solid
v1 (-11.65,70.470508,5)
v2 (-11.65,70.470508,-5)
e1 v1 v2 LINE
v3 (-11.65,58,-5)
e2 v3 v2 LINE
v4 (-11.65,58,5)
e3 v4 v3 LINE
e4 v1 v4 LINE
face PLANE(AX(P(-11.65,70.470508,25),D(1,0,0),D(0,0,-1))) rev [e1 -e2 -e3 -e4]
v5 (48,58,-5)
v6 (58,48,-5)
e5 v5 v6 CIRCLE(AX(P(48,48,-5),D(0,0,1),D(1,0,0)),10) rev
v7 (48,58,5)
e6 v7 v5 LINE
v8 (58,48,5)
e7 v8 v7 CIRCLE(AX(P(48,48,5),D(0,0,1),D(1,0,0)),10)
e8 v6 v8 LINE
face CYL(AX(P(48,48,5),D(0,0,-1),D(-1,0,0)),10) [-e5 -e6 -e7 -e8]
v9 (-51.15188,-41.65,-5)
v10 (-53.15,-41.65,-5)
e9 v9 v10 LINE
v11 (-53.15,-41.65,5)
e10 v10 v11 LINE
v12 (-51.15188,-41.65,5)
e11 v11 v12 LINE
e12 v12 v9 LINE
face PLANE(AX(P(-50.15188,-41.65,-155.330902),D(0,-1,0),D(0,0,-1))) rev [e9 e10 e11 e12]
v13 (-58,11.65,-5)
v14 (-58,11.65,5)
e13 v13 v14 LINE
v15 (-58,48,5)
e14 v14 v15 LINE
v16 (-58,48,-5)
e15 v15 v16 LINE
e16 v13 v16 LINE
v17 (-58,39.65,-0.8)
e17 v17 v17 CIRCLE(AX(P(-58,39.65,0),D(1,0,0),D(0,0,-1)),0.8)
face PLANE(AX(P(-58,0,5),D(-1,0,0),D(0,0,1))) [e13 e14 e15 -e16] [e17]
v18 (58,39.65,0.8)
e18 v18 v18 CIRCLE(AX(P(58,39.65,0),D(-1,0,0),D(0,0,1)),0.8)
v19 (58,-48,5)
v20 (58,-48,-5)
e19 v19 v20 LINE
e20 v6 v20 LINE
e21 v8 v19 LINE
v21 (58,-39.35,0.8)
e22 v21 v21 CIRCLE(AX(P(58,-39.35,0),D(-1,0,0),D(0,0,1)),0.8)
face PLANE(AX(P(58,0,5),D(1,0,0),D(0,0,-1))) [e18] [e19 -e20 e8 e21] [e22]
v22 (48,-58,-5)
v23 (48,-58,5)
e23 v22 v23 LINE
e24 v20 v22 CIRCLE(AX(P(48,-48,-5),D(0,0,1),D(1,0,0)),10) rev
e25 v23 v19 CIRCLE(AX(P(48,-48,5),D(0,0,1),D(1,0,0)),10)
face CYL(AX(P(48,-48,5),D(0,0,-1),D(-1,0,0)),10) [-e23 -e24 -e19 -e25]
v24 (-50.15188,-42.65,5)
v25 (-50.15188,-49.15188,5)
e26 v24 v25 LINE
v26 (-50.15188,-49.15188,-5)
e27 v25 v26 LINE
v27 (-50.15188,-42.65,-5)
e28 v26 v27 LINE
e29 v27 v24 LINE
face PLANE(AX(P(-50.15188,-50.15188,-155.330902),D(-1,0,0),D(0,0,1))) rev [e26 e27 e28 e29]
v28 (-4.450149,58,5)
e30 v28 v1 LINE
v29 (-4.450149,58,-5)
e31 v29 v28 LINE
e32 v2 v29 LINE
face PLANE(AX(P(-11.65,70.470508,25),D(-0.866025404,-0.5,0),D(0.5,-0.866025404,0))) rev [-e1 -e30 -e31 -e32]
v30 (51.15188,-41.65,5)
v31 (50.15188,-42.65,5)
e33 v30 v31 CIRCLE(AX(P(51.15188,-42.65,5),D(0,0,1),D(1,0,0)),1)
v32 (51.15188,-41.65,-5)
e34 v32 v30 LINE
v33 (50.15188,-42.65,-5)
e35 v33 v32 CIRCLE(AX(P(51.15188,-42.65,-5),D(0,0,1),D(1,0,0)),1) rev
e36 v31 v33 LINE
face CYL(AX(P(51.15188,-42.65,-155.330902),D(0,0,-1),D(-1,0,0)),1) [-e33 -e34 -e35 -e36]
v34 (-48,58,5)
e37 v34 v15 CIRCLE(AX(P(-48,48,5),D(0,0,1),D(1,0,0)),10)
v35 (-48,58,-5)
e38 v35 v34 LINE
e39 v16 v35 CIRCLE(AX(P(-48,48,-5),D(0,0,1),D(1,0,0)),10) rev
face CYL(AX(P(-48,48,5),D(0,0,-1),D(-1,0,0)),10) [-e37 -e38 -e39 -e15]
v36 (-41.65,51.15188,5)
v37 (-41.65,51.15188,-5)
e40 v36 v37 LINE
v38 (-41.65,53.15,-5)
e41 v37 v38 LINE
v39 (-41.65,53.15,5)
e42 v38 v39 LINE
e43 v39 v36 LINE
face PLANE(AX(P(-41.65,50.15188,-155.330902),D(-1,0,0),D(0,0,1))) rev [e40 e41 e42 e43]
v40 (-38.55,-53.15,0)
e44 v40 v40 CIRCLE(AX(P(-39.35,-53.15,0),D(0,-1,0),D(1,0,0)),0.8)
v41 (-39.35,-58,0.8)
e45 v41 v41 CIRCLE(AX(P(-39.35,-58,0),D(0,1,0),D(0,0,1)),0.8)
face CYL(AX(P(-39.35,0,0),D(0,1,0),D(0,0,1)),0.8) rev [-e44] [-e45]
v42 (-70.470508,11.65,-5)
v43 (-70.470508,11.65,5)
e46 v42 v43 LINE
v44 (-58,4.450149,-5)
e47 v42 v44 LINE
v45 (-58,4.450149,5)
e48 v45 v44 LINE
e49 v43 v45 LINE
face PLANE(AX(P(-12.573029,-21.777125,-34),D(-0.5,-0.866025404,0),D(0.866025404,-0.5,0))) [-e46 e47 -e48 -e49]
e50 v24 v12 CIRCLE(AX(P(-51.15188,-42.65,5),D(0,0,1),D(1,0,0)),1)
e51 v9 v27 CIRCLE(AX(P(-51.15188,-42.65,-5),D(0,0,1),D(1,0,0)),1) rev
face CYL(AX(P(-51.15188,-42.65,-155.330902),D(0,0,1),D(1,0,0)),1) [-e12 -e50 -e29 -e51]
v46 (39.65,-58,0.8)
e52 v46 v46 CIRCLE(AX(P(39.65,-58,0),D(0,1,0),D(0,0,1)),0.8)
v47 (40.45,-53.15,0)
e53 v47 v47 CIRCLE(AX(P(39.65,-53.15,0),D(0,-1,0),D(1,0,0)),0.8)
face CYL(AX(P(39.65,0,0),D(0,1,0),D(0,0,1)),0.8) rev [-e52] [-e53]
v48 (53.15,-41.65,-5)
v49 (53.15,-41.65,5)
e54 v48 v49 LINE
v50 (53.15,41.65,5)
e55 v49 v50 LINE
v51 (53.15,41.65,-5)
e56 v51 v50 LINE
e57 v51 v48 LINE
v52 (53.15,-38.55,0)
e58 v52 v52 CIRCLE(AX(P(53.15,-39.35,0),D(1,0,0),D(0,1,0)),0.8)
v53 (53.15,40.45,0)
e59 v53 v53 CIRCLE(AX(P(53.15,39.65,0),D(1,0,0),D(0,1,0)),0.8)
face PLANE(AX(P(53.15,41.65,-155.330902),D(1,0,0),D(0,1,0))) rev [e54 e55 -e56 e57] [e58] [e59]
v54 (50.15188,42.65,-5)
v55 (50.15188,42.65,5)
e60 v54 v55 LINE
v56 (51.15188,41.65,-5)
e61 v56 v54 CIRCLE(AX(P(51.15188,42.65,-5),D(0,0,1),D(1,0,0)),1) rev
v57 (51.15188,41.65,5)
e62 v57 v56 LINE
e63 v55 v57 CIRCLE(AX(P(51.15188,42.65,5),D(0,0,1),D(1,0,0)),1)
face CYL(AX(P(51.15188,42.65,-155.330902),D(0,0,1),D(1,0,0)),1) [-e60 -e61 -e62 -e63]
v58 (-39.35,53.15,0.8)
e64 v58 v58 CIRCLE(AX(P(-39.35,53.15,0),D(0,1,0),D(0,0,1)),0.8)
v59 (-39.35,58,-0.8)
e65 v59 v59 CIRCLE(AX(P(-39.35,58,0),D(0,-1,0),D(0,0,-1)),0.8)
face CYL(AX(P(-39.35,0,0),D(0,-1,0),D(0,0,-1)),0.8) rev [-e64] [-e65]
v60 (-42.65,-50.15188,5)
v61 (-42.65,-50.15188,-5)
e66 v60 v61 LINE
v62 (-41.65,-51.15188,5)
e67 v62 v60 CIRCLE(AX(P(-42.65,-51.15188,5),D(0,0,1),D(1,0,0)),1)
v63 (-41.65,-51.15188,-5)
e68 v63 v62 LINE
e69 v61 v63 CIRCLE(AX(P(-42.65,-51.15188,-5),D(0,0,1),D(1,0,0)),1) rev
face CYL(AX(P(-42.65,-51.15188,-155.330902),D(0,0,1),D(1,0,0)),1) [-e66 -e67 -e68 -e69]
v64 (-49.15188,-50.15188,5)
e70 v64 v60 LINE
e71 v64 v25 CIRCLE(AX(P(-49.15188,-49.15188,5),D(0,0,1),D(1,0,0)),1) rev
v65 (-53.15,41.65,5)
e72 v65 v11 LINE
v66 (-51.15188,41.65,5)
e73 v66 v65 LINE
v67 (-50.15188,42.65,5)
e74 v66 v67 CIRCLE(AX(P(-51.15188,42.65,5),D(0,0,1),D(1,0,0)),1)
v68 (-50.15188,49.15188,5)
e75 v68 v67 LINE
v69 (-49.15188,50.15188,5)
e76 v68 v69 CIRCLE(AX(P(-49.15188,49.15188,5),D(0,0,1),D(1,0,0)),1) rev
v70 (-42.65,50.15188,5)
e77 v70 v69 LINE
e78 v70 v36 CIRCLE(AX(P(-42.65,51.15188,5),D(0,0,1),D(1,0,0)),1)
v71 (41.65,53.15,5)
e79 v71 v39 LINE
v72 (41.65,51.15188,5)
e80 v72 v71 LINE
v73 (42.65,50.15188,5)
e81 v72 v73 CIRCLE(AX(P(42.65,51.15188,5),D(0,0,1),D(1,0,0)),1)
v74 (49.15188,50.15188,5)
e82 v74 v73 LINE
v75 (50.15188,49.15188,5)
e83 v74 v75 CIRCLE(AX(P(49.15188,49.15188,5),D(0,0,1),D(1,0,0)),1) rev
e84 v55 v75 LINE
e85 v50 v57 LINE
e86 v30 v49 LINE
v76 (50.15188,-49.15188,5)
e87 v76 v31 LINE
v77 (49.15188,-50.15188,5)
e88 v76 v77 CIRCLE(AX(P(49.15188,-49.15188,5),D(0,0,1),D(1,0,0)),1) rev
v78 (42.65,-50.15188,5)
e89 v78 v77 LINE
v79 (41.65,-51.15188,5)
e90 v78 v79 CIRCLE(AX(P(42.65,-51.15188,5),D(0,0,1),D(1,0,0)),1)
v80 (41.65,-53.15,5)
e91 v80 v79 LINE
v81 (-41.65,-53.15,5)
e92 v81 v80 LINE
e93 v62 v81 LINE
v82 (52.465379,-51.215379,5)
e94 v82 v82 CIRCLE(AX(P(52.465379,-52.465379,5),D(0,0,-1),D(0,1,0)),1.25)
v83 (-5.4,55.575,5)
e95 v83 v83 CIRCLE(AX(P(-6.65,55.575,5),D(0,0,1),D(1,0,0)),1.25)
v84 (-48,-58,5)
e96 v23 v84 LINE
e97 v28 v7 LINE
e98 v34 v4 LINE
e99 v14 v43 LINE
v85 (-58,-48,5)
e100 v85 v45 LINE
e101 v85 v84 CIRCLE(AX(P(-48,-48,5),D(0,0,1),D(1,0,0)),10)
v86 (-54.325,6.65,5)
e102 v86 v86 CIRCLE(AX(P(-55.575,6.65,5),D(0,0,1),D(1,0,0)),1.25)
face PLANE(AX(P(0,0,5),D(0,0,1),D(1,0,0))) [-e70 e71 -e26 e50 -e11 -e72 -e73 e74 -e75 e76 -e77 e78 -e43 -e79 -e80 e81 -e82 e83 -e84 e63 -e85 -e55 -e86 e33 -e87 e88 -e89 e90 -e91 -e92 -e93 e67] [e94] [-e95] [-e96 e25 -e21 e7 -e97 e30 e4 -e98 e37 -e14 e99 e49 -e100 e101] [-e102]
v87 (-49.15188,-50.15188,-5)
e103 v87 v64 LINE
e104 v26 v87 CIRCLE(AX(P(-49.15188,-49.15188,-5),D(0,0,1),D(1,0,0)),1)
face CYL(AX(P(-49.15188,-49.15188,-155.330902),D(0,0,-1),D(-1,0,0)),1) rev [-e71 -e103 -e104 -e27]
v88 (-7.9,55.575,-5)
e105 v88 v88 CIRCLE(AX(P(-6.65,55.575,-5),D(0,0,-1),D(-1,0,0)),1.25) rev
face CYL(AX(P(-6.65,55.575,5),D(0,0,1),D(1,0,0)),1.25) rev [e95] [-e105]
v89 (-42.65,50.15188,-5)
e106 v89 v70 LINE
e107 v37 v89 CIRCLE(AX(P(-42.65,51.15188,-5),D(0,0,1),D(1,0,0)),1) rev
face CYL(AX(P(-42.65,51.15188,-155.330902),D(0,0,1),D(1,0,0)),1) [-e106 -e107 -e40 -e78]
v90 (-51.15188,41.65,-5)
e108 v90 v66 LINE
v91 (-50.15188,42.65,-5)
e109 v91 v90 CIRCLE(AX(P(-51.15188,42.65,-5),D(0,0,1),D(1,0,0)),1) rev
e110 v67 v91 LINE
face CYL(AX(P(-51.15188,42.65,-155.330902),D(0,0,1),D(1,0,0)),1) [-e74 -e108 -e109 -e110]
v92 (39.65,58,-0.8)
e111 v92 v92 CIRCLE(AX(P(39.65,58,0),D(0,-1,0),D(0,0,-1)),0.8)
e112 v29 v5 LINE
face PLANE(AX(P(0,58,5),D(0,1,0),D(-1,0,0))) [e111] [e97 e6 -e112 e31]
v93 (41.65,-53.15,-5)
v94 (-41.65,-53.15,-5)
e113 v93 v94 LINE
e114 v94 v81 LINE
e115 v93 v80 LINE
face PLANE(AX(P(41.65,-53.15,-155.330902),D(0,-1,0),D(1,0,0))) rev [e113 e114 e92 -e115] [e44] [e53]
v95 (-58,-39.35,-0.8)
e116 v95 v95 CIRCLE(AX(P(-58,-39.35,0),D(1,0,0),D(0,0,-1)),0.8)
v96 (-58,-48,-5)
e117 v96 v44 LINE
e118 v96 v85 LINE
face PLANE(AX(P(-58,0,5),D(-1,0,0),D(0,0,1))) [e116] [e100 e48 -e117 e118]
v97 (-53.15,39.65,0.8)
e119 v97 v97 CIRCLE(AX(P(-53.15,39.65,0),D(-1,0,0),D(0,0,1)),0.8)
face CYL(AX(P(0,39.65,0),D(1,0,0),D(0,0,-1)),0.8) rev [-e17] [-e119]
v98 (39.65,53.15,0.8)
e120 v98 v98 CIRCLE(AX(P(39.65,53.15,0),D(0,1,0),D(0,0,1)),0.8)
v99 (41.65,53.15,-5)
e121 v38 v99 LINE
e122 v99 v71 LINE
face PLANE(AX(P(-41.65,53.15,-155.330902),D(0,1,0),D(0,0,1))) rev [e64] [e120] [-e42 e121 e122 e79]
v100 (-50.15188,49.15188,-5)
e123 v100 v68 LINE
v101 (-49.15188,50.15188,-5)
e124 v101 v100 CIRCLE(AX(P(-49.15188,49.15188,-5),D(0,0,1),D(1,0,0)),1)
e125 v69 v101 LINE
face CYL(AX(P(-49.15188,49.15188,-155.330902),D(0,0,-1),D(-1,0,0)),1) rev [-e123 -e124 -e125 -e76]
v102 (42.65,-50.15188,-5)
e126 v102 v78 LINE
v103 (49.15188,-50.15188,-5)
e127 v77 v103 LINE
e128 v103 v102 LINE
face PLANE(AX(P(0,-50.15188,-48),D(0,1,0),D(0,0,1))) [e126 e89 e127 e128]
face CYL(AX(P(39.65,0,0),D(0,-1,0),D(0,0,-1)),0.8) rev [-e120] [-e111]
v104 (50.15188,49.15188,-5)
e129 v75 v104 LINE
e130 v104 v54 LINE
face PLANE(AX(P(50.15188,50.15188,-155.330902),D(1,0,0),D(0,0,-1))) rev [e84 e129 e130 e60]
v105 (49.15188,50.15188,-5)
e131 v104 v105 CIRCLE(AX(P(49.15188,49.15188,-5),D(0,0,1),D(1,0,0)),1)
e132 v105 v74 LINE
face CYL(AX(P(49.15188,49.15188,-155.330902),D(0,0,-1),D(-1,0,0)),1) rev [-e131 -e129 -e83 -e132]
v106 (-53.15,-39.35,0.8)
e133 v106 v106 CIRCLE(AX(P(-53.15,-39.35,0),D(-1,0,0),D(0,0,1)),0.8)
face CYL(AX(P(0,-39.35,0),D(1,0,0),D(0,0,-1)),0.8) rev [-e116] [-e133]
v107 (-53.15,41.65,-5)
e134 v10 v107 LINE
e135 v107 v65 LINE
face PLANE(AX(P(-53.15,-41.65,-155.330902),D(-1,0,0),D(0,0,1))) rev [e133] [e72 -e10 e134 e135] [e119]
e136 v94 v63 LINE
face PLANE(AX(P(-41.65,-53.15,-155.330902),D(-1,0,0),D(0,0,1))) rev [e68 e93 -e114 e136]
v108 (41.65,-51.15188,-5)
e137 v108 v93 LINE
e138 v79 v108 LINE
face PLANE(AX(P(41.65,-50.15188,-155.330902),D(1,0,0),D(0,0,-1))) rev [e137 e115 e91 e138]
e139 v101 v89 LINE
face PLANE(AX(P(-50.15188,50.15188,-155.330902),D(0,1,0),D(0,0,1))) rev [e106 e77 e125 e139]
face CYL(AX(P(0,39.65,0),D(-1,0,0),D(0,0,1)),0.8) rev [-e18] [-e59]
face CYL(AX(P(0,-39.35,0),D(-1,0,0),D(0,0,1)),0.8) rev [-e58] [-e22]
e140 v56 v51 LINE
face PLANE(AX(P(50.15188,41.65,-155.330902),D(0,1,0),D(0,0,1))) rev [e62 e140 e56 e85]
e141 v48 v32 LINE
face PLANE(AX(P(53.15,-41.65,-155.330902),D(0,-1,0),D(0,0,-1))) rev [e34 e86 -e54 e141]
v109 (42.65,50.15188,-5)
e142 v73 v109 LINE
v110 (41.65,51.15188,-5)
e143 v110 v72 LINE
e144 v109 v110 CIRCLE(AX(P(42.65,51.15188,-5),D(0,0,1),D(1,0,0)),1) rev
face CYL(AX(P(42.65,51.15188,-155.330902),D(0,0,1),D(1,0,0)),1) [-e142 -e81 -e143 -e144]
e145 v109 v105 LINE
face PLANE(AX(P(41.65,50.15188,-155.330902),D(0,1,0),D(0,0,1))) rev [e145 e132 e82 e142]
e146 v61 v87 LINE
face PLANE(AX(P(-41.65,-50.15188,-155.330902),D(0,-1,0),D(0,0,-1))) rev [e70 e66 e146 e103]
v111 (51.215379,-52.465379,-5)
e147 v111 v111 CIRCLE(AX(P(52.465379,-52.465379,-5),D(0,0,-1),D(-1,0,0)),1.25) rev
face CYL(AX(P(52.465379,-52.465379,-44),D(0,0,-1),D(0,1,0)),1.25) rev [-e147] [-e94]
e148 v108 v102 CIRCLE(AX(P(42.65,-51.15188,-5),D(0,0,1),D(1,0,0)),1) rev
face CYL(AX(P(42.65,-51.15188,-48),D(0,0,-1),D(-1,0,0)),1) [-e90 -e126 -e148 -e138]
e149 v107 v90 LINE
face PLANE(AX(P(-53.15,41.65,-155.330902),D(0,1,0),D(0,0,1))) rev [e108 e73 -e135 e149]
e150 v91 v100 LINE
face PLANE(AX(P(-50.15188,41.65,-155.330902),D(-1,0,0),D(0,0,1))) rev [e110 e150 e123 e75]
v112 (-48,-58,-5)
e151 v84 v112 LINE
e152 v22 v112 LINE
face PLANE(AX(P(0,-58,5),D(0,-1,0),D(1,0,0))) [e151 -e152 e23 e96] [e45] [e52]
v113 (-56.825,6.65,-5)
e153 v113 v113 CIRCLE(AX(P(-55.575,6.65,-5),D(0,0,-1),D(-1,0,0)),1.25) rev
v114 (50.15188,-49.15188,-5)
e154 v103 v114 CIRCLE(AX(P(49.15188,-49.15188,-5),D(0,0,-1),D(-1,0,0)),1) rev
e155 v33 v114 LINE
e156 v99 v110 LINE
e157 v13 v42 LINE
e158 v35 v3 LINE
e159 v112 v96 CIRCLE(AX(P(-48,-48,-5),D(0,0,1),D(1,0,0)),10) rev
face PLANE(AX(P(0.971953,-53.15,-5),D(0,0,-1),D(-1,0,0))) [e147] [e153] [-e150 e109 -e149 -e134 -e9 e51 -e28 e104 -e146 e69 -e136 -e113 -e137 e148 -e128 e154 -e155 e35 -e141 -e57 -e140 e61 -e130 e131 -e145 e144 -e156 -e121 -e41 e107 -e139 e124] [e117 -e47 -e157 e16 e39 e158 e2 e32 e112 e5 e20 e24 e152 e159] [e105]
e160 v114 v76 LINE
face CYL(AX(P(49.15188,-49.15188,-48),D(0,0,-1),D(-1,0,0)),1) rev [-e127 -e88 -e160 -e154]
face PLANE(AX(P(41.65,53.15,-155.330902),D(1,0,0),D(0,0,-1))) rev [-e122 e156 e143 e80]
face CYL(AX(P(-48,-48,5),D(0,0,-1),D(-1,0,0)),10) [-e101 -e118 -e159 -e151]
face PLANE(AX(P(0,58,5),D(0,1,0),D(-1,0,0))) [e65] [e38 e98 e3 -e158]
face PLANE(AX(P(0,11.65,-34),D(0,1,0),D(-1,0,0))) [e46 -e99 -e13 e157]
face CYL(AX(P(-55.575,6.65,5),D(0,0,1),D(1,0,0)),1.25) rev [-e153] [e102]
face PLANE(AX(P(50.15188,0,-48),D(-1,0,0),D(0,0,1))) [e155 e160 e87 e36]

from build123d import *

# Parameters (mm, degrees)
BASE_DEPTH                       = 5
ARM_DEPTH                        = 5
CUT_EXTRUDE1_DEPTH               = 98.51535195125132
BOSS_EXTRUDE4_DEPTH              = 28
CLEARANCE_DEPTH                  = 20
M2X0_4_TAPPED_HOLE1_AT_2_COUNT   = 2
M2X0_4_TAPPED_HOLE1_AT_2_PITCH   = 79
M2X0_4_TAPPED_HOLE2_AT_2_COUNT   = 2
M2X0_4_TAPPED_HOLE2_AT_2_PITCH   = 79
EXTENDER_DEPTH                   = 29
ANGLED_HORIZONTAL_DEPTH          = 10
ARM_START                        = -5
ARM_HOLDER_DEPTH                 = 10
FILLET1_R                        = 1
FILLET2_R                        = 10
M3X0_5_TAPPED_HOLE2_D            = 2.5
BOSS_EXTRUDE18_REACH             = 170.267
SKETCH39_W                       = 4.000000000000028
SKETCH39_H                       = 10.000000000000007
BOSS_EXTRUDE18_DIRECTION_2_REACH = 170.267
SHIM_SUPPORT_ARM_DEPTH           = 6.85
BOSS_EXTRUDE17_REACH             = 169.03
FILLET4_R                        = 2
SPLIT1_START                     = -44
SPLIT1_OUTLINE_R                 = 1.25
SPLIT1_DEPTH                     = 39


# Read off the part's stored shape, not the designer's step: Split1
with BuildPart() as part:
    # Sketch1 → base (new, symmetric)
    with BuildSketch(Plane.XY):
        Polygon((58.00000000000011, 58.00000000000005), (58.00000000000011, -58.00000000000005), (-58.00000000000008, -58.00000000000009), (-58.00000000000008, 58.00000000000009), align=None)
        Polygon((-41.5, 53.00000000000001), (41.5, 53.00000000000001), (41.5, 50.00188016), (50.00188015999998, 50.00188015999996), (50.00188015999998, 41.49999999999998), (52.999999999999986, 41.49999999999998), (52.999999999999986, -41.49999999999998), (50.00188015999996, -41.499999999999964), (50.00188015999999, -50.001880160000006), (41.499999999999964, -50.00188015999996), (41.49999999999998, -52.99999999999998), (-41.5, -53.00000000000001), (-41.5, -50.00188016), (-50.00188015999999, -50.001880160000006), (-50.00188015999996, -41.499999999999964), (-52.999999999999986, -41.49999999999998), (-52.999999999999986, 41.49999999999998), (-50.00188015999998, 41.49999999999998), (-50.00188015999998, 50.00188015999996), (-41.5, 50.00188016), align=None, mode=Mode.SUBTRACT)
    extrude(amount=BASE_DEPTH, both=True)

    # Sketch2 → arm (add, symmetric)
    with BuildSketch(Plane(origin=(0, 0, 0), x_dir=(0.7071067811865476, -0.7071067811865475, 0), z_dir=(0.7071067811865475, 0.7071067811865476, 0))):
        Polygon((70.9254691007821, 5), (82.02438661763962, 5), (82.02438661763962, 44), (32.02438661763962, 43.999999999999986), (32.02438661763962, 33), (70.9254691007821, 33), align=None)
    extrude(amount=ARM_DEPTH, both=True)

    # Sketch3 → Cut-Extrude1 (cut, through all)
    with BuildSketch(Plane.XY):
        Polygon((54.81801948466061, -61.889087296526085), (61.88908729652609, -54.81801948466061), (58.00000000000011, -50.928932188134624), (58.0000000000001, -58.00000000000005), (50.92893218813458, -58.00000000000006), align=None)
    extrude(amount=-CUT_EXTRUDE1_DEPTH, mode=Mode.SUBTRACT)

    # Sketch5 → Boss-Extrude4 (add)
    with BuildSketch(Plane(origin=(0, 0, -5), x_dir=(-1, 0, 0), z_dir=(0, 0, -1))):
        Polygon((-50.15188015999995, -50.151880159999976), (-46.61634625406723, -53.68741406593269), (-43.080812348134494, -50.15188015999998), align=None)
        Polygon((-53.68741406593271, -46.61634625406722), (-50.15188015999995, -50.151880159999976), (-50.15188015999996, -43.08081234813448), align=None)
    extrude(amount=BOSS_EXTRUDE4_DEPTH)

    # Sketch7 → clearance (cut)
    with BuildSketch(Plane.XY.offset(15)):
        Polygon((-41.65, 53.150000000000006), (41.649999999999984, 53.150000000000006), (41.649999999999984, 50.15188016), (50.151880159999976, 50.15188016), (50.151880159999976, 41.64999999999998), (53.149999999999984, 41.64999999999998), (53.14999999999999, -41.64999999999996), (50.15188015999996, -41.64999999999996), (50.15188015999996, -50.15188015999998), (41.64999999999998, -50.15188015999998), (41.64999999999998, -53.14999999999998), (-41.65, -53.149999999999984), (-41.65, -50.15188016), (-50.15188015999999, -50.15188016), (-50.15188015999999, -41.64999999999998), (-53.149999999999984, -41.64999999999998), (-53.149999999999984, 41.64999999999998), (-50.151880159999976, 41.64999999999998), (-50.151880159999976, 50.15188015999996), (-41.65, 50.15188015999996), align=None)
    extrude(amount=-CLEARANCE_DEPTH, mode=Mode.SUBTRACT)

    # Sketch12 → M2x0.4 Tapped Hole1 (revolve, cut)
    with BuildSketch(Plane(origin=(-39.350000000000016, 0, 0), x_dir=(0, 0, -1), z_dir=(1, 0, 0))):
        Polygon((0, 0), (-1.421e-14, 58.00000000000009), (0.7999999999999855, 58.00000000000009), (0.7999999999999883, -1.46e-15), align=None)
    m2x0_4_tapped_hole1 = revolve(axis=Axis((-39.350000000000016, -6.349999999999991, 0), (0, 1, 0)), mode=Mode.SUBTRACT)

    # M2x0.4 Tapped Hole1 at 2: M2x0.4 Tapped Hole1 ×2
    with Locations(*[(i * M2X0_4_TAPPED_HOLE1_AT_2_PITCH, 0, 0) for i in range(1, M2X0_4_TAPPED_HOLE1_AT_2_COUNT)]):
        add(m2x0_4_tapped_hole1, mode=Mode.SUBTRACT)

    # Mirror1: M2x0.4 Tapped Hole1 across plane
    add(m2x0_4_tapped_hole1.mirror(Plane.ZX), mode=Mode.SUBTRACT)

    # Mirror1 copy 1 sketch → Mirror1 copy 1 (revolve, cut)
    with BuildSketch(Plane(origin=(39.649999999999984, 0, 0), x_dir=(0, 0, -1), z_dir=(1, 0, 0))):
        Polygon((0, 0), (-1.421e-14, -58.00000000000009), (0.7999999999999855, -58.00000000000009), (0.7999999999999883, 1.46e-15), align=None)
    revolve(axis=Axis((39.649999999999984, 6.349999999999991, 0), (0, 1, 0)), mode=Mode.SUBTRACT)

    # Sketch15 → M2x0.4 Tapped Hole2 (revolve, cut)
    with BuildSketch(Plane.ZX.offset(39.65)):
        Polygon((0, 0), (-1.421e-14, 58.00000000000011), (0.7999999999999923, 58.00000000000011), (0.7999999999999883, -1.46e-15), align=None)
    m2x0_4_tapped_hole2 = revolve(axis=Axis((-6.349999999999991, 39.65, 0), (1, 0, 0)), mode=Mode.SUBTRACT)

    # M2x0.4 Tapped Hole2 at 2: M2x0.4 Tapped Hole2 ×2
    with Locations(*[(0, -i * M2X0_4_TAPPED_HOLE2_AT_2_PITCH, 0) for i in range(1, M2X0_4_TAPPED_HOLE2_AT_2_COUNT)]):
        add(m2x0_4_tapped_hole2, mode=Mode.SUBTRACT)

    # Mirror2: M2x0.4 Tapped Hole2 across plane
    add(m2x0_4_tapped_hole2.mirror(Plane(origin=(0, 0, 0), x_dir=(0, 0, 1), z_dir=(1, 0, 0))), mode=Mode.SUBTRACT)

    # Mirror2 copy 1 sketch → Mirror2 copy 1 (revolve, cut)
    with BuildSketch(Plane.ZX.offset(-39.35)):
        Polygon((0, 0), (-1.421e-14, -58.00000000000011), (0.7999999999999923, -58.00000000000011), (0.7999999999999883, 1.46e-15), align=None)
    revolve(axis=Axis((6.349999999999991, -39.35, 0), (1, 0, 0)), mode=Mode.SUBTRACT)

    # Sketch16 → extender (add)
    with BuildSketch(Plane(origin=(0, 0, -5), x_dir=(-1, 0, 0), z_dir=(0, 0, -1))):
        Polygon((53.149999999999984, 11.649999999999979), (70.47050807568874, 11.64999999999998), (53.14999999999998, 1.649999999999978), align=None)
    extender = extrude(amount=EXTENDER_DEPTH)

    # Sketch17 → angled horizontal (add)
    with BuildSketch(Plane(origin=(0, 0, -34), x_dir=(-1, 0, 0), z_dir=(0, 0, -1))):
        Polygon((106.18300858899104, 64.68300858899104), (114.84326262683541, 56.02275455114666), (70.47050807568874, 11.64999999999998), (53.14999999999998, 1.649999999999971), (53.149999999999984, 11.649999999999979), align=None)
    angled_horizontal = extrude(amount=ANGLED_HORIZONTAL_DEPTH)

    # Sketch21 → Arm Holder (add)
    with BuildSketch(Plane.XY.offset(ARM_START)):
        Polygon((-53.14999999999998, 1.649999999999971), (-53.14999999999999, 11.649999999999979), (-70.47050807568874, 11.649999999999979), align=None)
        Polygon((-11.649999999999986, 70.47050807568874), (-1.649999999999978, 53.14999999999997), (-11.649999999999986, 53.149999999999984), align=None)
    extrude(amount=ARM_HOLDER_DEPTH)

    # Fillet1
    fillet1_edges = [part.edges().sort_by_distance(p)[0] for p in [
        (50.15188015999996, -50.151880159999976, -14),
        (-41.65, 50.15188015999996, 0),
        (41.649999999999984, 50.15188016, 0),
        (50.151880159999976, 50.15188016, 0),
        (50.151880159999976, 41.64999999999998, 0),
        (50.15188015999996, -41.64999999999996, 0),
        (41.64999999999998, -50.15188015999998, 0),
        (-41.65, -50.15188016, 0),
        (-50.15188015999999, -50.15188016, 0),
        (-50.15188015999999, -41.64999999999998, 0),
        (-50.151880159999976, 41.64999999999998, 0),
        (-50.151880159999976, 50.15188015999996, 0),
    ]]
    fillet(fillet1_edges, radius=FILLET1_R)

    # Fillet2
    fillet2_edges = [part.edges().sort_by_distance(p)[0] for p in [
        (58.00000000000011, -58.00000000000005, -19.5),
        (58.00000000000011, 58.00000000000005, 0),
        (-58.00000000000008, 58.00000000000009, 0),
        (-58.00000000000008, -58.00000000000009, 0),
    ]]
    fillet(fillet2_edges, radius=FILLET2_R)

    # M3x0.5 Tapped Hole2 (through all)
    with Locations(Plane(origin=(-8.64e-15, 8.64e-15, -43.99999999999998), x_dir=(-1, 0, 1e-16), z_dir=(-1e-16, 1e-16, -1))):
        with Locations((-52.465379323, -52.465379323)):
            Hole(M3X0_5_TAPPED_HOLE2_D / 2)

    # Sketch38 → M3x0.5 Tapped Hole3 (revolve, cut)
    with BuildSketch(Plane(origin=(-55.57499999999998, 6.6499999999999755, 5), x_dir=(0, -1, 0), z_dir=(1, 0, 0))):
        Polygon((0, 0), (-7.49e-15, 30.561075773784445), (1.249999999999985, 29.810000000000002), (1.249999999999989, -1.4e-15), align=None)
    m3x0_5_tapped_hole3 = revolve(axis=Axis((-55.57499999999998, 6.6499999999999755, 11.34999999999999), (0, 0, -1)), mode=Mode.SUBTRACT)

    # U part of Outside arm: extender, angled horizontal, M3x0.5 Tapped Hole3 across plane
    add(extender.mirror(Plane(origin=(0, 0, 0), x_dir=(0, 0, 1), z_dir=(0.7071067811865475, 0.7071067811865476, 0))))
    add(angled_horizontal.mirror(Plane(origin=(0, 0, 0), x_dir=(0, 0, 1), z_dir=(0.7071067811865475, 0.7071067811865476, 0))))
    add(m3x0_5_tapped_hole3.mirror(Plane(origin=(0, 0, 0), x_dir=(0, 0, 1), z_dir=(0.7071067811865475, 0.7071067811865476, 0))), mode=Mode.SUBTRACT)

    # Sketch39 → Boss-Extrude18 (add, up to next)
    with BuildSketch(Plane(origin=(0, 0, 0), x_dir=(0.7071067811865476, -0.7071067811865475, 0), z_dir=(0.7071067811865475, 0.7071067811865476, 0)), mode=Mode.PRIVATE) as boss_extrude18_sk1:
        with Locations((-118.82051942088825, 39)):
            Rectangle(SKETCH39_W, SKETCH39_H)
    boss_extrude18_tool1 = extrude(boss_extrude18_sk1.sketch, amount=BOSS_EXTRUDE18_REACH, mode=Mode.PRIVATE) - part.part
    add(boss_extrude18_tool1.solids().sort_by_distance((-84.018795, 84.018795, -39))[0])

    # Sketch39 → Boss-Extrude18 direction 2 (add, up to next)
    with BuildSketch(Plane(origin=(0, 0, 0), x_dir=(0.7071067811865476, -0.7071067811865475, 0), z_dir=(0.7071067811865475, 0.7071067811865476, 0)), mode=Mode.PRIVATE) as boss_extrude18_direction_2_sk1:
        with Locations((-118.82051942088825, 39)):
            Rectangle(SKETCH39_W, SKETCH39_H)
    boss_extrude18_direction_2_tool1 = extrude(boss_extrude18_direction_2_sk1.sketch, amount=-BOSS_EXTRUDE18_DIRECTION_2_REACH, mode=Mode.PRIVATE) - part.part
    add(boss_extrude18_direction_2_tool1.solids().sort_by_distance((-84.018795, 84.018795, -39))[0])

    # Sketch34 → Shim support arm (add)
    with BuildSketch(Plane(origin=(27.06097651600918, -27.060976516009177, 0), x_dir=(0, 0, -1), z_dir=(0.7071067811865476, -0.7071067811865475, 0))):
        Polygon((43.99999999999999, 4.999999999999997), (33, 5.000000000000001), (9.000000000000005, 36.895450840129975), (19.999999999999986, 36.895450840129975), align=None)
    shim_support_arm = extrude(amount=SHIM_SUPPORT_ARM_DEPTH)

    # Boss-Extrude17: up to this face of the body (flat: up to its plane)
    boss_extrude17_end = Plane(part.part.faces().sort_by_distance((44.295095937, -14.670538547, -21))[0])
    # Sketch35 → Boss-Extrude17 (add, up to the picked face)
    with BuildSketch(Plane(origin=(0, 0, -5), x_dir=(-1, 0, 0), z_dir=(0, 0, -1)), mode=Mode.PRIVATE) as boss_extrude17_sk1:
        Polygon((-53.149999999999984, -0.971953032018356), (-57.99368145112784, -5.815634483146219), (-53.149999999999984, -10.659315934274082), align=None)
    boss_extrude17_tool1 = split(extrude(boss_extrude17_sk1.sketch, amount=BOSS_EXTRUDE17_REACH, mode=Mode.PRIVATE), bisect_by=boss_extrude17_end, keep=Keep.BOTH, mode=Mode.PRIVATE)
    boss_extrude17 = boss_extrude17_tool1.solids().sort_by(Axis((54.76456, -5.815634, -5), (0, 0, -1)))[0]
    add(boss_extrude17)

    # Mirror4: Shim support arm, Boss-Extrude17 across plane
    add(shim_support_arm.mirror(Plane(origin=(0, 0, 0), x_dir=(0, 0, 1), z_dir=(0.7071067811865475, 0.7071067811865476, 0))))
    add(boss_extrude17.mirror(Plane(origin=(0, 0, 0), x_dir=(0, 0, 1), z_dir=(0.7071067811865475, 0.7071067811865476, 0))))

    # Fillet4
    fillet4_edges = [part.edges().sort_by_distance(p)[0] for p in [
        (30.596510421941918, -23.52544261007644, -38.5),
        (55.57184072556391, -3.3937937575822943, -19.999999999999986),
        (35.440191873069764, -28.36912406120429, -38.5),
        (53.149999999999984, -5.815634483146219, -11.577170030046497),
        (3.3937937575823067, -55.57184072556391, -19.999999999999986),
        (28.369124061204293, -35.440191873069764, -38.5),
        (23.52544261007645, -30.596510421941908, -38.5),
        (5.815634483146232, -53.149999999999984, -11.577170030046497),
    ]]
    fillet(fillet4_edges, radius=FILLET4_R)

    # Split1 outline → Split1 (cut)
    # profile 1 of 2: a face of its own
    with BuildSketch(Plane.XY.offset(SPLIT1_START)):
        with BuildLine():
            ThreePointArc((50.588190451, -57.659258263), (55.071067812, -55.071067812), (57.659258263, -50.588190451))
            Line((57.659258263, -50.588190451), (36.854405435, -29.783337624))
            ThreePointArc((36.854405435, -29.783337624), (36.268618998, -28.369124062), (36.854405435, -26.954910499))
            Line((36.854405435, -26.954910499), (57.993681451, -5.815634483))
            Line((57.993681451, -5.815634483), (53.15, -0.971953032))
            Line((53.15, -0.971953032), (32.010723984, -22.111229048))
            ThreePointArc((32.010723984, -22.111229048), (30.596510422, -22.697015485), (29.18229686, -22.111229048))
            Line((29.18229686, -22.111229048), (26.180194847, -19.109127035))
            Line((26.180194847, -19.109127035), (19.109127035, -26.180194847))
            Line((19.109127035, -26.180194847), (22.111229048, -29.18229686))
            ThreePointArc((22.111229048, -29.18229686), (22.697015485, -30.596510422), (22.111229048, -32.010723984))
            Line((22.111229048, -32.010723984), (0.971953032, -53.15))
            Line((0.971953032, -53.15), (5.815634483, -57.993681451))
            Line((5.815634483, -57.993681451), (26.954910499, -36.854405435))
            ThreePointArc((26.954910499, -36.854405435), (28.369124062, -36.268618998), (29.783337624, -36.854405435))
            Line((29.783337624, -36.854405435), (50.588190451, -57.659258263))
        make_face()
        with Locations((52.465379323, -52.465379323)):
            Circle(SPLIT1_OUTLINE_R, mode=Mode.SUBTRACT)
    # profile 2 of 2: a face of its own
    with BuildSketch(Plane.XY.offset(SPLIT1_START)):
        Polygon((-11.65, 53.15), (-1.65, 53.15), (-11.65, 70.470508076), (-56.022754551, 114.843262627), (-114.843262627, 56.022754551), (-70.470508076, 11.65), (-53.15, 1.65), (-53.15, 11.65), (-103.354581464, 61.854581464), (-61.854581464, 103.354581464), align=None)
    extrude(amount=SPLIT1_DEPTH, mode=Mode.SUBTRACT)


solid = part.part
